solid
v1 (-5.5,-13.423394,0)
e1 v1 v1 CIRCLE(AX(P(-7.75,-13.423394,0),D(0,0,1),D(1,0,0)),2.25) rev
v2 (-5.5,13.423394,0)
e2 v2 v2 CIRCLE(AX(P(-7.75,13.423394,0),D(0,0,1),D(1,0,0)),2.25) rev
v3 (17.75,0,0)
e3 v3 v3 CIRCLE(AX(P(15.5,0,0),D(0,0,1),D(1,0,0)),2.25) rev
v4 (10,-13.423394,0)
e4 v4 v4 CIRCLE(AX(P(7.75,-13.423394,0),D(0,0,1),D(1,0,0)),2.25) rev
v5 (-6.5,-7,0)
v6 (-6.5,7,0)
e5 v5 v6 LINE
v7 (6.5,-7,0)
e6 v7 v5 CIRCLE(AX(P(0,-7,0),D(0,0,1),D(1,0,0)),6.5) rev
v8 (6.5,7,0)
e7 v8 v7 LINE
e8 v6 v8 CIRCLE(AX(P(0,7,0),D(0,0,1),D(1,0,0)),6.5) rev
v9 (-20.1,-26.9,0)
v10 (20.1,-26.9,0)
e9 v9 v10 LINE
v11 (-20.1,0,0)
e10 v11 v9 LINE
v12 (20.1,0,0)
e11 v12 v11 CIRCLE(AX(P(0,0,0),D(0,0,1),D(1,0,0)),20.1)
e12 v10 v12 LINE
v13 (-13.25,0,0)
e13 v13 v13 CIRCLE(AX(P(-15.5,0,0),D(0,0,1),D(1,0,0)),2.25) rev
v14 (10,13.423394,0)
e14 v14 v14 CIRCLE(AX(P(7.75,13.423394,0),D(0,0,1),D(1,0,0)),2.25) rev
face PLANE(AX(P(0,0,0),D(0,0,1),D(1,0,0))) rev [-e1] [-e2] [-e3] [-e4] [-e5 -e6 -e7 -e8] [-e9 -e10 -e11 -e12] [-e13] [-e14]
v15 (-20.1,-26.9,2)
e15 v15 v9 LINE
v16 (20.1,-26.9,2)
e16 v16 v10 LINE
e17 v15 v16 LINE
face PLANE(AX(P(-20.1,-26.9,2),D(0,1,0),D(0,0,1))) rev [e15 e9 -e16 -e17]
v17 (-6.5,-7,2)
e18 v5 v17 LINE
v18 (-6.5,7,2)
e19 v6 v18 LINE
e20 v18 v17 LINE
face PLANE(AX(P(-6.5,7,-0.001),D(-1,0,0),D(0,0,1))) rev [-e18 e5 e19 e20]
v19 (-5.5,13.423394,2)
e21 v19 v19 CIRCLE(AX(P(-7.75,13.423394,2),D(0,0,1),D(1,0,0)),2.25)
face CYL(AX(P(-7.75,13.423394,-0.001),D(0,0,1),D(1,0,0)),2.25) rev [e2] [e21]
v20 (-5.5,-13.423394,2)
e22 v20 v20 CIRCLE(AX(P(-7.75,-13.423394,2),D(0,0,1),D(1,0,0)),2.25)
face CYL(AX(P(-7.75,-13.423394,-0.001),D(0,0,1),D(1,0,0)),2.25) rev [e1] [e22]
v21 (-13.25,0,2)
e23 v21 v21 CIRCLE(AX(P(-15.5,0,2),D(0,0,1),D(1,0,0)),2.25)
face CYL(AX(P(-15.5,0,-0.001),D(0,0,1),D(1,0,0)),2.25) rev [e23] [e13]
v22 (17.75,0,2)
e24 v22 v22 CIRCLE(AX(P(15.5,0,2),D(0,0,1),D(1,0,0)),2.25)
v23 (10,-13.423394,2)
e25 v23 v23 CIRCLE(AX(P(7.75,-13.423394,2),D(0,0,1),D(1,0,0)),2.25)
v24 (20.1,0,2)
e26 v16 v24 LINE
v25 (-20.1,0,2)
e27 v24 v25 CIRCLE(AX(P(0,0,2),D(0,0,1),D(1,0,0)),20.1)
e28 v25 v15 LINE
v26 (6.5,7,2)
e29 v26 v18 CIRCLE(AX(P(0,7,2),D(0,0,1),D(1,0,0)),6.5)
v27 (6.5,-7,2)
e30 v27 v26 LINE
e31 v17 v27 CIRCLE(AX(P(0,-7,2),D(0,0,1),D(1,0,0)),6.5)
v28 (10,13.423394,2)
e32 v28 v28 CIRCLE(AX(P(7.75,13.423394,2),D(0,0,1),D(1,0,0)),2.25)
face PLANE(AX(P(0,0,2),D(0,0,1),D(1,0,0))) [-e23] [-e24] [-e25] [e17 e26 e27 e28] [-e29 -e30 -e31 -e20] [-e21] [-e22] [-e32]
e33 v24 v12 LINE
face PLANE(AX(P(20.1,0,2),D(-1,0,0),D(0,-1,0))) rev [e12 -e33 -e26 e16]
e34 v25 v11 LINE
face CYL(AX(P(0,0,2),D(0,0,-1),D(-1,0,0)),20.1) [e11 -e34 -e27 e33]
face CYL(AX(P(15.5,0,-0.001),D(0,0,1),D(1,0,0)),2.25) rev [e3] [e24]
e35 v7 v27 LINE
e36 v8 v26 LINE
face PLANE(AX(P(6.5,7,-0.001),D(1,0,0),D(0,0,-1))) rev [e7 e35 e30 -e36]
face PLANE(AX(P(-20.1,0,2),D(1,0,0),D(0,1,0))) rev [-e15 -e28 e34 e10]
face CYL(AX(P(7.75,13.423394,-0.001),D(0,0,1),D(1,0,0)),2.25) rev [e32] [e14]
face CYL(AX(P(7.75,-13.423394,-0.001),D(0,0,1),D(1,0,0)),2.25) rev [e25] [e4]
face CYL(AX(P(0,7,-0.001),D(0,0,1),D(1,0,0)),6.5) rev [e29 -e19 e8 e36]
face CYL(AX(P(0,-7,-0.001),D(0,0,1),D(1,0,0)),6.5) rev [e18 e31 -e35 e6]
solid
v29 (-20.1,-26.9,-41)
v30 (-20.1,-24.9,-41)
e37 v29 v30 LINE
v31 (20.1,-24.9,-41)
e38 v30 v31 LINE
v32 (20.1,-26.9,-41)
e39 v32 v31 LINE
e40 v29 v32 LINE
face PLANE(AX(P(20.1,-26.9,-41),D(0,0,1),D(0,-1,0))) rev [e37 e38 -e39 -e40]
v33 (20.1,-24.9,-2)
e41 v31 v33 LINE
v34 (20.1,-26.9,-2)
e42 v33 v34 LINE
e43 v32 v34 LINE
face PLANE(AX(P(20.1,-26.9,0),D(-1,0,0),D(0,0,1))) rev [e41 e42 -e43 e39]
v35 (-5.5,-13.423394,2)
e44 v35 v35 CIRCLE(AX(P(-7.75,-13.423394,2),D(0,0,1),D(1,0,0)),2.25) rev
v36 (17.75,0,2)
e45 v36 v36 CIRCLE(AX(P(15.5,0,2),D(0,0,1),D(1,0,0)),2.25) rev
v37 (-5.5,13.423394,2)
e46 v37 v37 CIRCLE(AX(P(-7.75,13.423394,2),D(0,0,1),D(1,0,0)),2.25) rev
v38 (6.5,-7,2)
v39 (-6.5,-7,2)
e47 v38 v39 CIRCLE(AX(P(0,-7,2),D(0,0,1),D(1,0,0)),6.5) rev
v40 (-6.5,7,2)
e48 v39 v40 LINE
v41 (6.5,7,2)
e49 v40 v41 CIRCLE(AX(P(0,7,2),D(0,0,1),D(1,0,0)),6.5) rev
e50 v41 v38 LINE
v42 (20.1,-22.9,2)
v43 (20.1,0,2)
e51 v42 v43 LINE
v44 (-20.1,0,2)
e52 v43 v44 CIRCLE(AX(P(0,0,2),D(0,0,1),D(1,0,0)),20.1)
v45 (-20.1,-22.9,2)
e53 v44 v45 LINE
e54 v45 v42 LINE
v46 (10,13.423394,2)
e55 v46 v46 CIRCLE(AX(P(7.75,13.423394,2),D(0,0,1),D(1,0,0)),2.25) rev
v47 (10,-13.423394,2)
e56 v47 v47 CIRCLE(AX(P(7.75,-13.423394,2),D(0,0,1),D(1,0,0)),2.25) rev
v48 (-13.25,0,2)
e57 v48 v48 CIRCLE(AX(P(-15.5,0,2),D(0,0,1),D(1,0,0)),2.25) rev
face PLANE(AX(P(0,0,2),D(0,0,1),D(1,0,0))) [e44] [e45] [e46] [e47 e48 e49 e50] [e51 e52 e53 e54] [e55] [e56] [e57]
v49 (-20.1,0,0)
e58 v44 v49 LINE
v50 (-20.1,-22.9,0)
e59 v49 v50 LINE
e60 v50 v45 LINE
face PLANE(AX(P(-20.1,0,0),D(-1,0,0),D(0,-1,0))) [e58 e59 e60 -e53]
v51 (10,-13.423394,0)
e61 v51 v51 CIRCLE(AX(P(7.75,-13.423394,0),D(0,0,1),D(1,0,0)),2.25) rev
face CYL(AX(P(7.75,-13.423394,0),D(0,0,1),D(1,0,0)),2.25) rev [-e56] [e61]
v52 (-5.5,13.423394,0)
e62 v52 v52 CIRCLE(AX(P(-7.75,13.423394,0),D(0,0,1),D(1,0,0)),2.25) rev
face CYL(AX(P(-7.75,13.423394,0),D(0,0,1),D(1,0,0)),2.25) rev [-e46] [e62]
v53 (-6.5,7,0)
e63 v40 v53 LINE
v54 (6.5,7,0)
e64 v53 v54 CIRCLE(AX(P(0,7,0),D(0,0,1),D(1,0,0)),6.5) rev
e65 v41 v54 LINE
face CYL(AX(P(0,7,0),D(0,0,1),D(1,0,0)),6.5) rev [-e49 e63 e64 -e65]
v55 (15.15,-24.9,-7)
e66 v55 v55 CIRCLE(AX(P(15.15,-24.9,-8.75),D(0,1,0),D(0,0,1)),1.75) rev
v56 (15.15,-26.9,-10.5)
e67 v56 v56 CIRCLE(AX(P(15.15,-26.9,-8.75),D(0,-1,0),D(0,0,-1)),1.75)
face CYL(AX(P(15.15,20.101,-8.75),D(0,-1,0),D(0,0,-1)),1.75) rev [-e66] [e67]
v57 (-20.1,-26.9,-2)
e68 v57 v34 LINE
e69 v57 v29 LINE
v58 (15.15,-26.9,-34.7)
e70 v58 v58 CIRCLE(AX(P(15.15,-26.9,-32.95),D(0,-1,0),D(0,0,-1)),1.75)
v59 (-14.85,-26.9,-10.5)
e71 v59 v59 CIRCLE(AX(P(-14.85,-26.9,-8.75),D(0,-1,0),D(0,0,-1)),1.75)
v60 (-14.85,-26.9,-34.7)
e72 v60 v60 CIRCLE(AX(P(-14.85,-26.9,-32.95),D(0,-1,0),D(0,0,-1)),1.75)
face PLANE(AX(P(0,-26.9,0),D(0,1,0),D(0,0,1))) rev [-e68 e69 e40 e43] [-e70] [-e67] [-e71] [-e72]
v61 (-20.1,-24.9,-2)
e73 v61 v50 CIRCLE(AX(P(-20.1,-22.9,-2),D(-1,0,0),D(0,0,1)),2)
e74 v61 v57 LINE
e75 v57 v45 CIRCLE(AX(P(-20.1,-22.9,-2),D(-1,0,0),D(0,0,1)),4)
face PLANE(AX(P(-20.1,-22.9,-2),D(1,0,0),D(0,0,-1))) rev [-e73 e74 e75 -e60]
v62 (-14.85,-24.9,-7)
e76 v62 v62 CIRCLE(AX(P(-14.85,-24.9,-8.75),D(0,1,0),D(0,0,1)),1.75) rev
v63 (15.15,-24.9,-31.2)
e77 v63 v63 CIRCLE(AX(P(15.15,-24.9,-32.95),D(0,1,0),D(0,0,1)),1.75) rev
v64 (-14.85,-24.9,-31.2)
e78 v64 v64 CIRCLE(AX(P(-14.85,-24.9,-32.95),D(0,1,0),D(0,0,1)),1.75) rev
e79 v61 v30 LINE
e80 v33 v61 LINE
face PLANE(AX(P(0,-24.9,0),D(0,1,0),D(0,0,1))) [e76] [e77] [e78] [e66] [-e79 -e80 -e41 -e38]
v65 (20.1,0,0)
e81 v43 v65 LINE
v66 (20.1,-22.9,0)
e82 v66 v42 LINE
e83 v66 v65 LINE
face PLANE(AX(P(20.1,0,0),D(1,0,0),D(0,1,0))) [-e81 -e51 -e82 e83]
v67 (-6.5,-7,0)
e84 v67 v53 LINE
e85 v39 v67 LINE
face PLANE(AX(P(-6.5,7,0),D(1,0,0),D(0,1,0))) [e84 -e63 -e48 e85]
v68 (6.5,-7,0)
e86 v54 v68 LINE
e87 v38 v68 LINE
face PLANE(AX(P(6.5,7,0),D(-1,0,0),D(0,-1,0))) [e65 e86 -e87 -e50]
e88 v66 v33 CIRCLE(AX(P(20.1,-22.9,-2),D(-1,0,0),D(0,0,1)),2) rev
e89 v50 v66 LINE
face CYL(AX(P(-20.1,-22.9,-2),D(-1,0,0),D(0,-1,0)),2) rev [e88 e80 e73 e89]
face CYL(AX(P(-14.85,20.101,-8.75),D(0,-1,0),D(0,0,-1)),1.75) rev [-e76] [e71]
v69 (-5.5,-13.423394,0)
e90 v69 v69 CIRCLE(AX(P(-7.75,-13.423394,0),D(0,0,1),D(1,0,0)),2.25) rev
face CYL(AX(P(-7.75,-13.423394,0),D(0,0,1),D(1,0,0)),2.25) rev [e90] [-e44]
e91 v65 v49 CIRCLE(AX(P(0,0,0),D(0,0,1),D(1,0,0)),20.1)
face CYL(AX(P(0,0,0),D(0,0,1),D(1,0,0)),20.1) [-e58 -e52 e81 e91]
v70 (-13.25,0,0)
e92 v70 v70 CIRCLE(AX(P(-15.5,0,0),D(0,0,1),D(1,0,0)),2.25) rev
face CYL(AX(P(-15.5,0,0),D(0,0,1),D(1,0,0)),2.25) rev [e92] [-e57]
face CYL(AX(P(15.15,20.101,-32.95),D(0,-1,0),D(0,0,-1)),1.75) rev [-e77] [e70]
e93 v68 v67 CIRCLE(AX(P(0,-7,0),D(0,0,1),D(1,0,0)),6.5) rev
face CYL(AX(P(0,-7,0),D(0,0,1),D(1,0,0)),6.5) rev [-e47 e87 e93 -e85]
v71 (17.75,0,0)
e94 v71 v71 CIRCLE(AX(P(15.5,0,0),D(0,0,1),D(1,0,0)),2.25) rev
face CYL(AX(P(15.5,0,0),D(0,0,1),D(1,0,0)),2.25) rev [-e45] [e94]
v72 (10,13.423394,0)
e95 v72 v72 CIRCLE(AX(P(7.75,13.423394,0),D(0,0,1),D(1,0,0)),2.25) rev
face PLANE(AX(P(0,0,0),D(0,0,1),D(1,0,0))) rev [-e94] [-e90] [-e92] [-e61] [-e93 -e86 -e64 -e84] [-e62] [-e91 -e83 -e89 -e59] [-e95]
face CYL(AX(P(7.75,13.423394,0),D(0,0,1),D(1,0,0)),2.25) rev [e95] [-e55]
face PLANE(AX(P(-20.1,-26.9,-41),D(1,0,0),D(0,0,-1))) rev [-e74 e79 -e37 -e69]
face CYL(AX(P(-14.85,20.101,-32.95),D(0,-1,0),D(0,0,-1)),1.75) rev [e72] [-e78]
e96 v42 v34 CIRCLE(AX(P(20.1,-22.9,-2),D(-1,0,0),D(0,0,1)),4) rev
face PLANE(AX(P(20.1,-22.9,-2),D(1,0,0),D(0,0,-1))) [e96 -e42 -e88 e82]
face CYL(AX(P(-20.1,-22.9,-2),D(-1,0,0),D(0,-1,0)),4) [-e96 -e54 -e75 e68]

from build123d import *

# Parameters (mm, degrees)
EXTRUDE_1_DEPTH                  = 2
CUT_EXTRUDE_1_REACH              = 35.64
SKETCH_2_R                       = 2.25
CUT_EXTRUDE_2_REACH              = 35.64
SHEET_METAL_2_OUTLINE_R          = 2.25
SHEET_METAL_2_DEPTH              = 2
SM_EDGE_FLANGE_1_STRIP_W         = 12
SM_EDGE_FLANGE_1_STRIP_H         = 2
SM_EDGE_FLANGE_1_STRIP_CUT_DEPTH = 40.2
SM_EDGE_FLANGE_1_DEPTH           = 40.2
SKETCH_12_R                      = 1.75
CUT_EXTRUDE_3_DEPTH              = 2


# Read off the part's stored shape, not the designer's step: 转换实体2
# Sheet-metal steps are written as plain solids
with BuildPart() as part:
    # 草图1 → 凸台-拉伸1 (new body)
    with BuildSketch(Plane.XY):
        with BuildLine():
            Line((-20.1, 0), (-20.1, -26.9))
            Line((-20.1, -26.9), (20.1, -26.9))
            Line((20.1, -26.9), (20.1, 0))
            ThreePointArc((20.1, 0), (0, 20.1), (-20.1, 0))
        make_face()
    extrude(amount=EXTRUDE_1_DEPTH)

    # Sketch 2 → 切除-拉伸1 (cut, up to next)
    with BuildSketch(Plane.XY.offset(2), mode=Mode.PRIVATE) as cut_extrude_1_sk1:
        with Locations((-15.5, 0)):
            Circle(SKETCH_2_R)
    cut_extrude_1_tool1 = extrude(cut_extrude_1_sk1.sketch, amount=-CUT_EXTRUDE_1_REACH, mode=Mode.PRIVATE) & part.part
    # Sketch 2 → 切除-拉伸1 (cut, up to next)
    with BuildSketch(Plane.XY.offset(2), mode=Mode.PRIVATE) as cut_extrude_1_sk2:
        with Locations((-7.75, 13.423393759)):
            Circle(SKETCH_2_R)
    cut_extrude_1_tool2 = extrude(cut_extrude_1_sk2.sketch, amount=-CUT_EXTRUDE_1_REACH, mode=Mode.PRIVATE) & part.part
    # Sketch 2 → 切除-拉伸1 (cut, up to next)
    with BuildSketch(Plane.XY.offset(2), mode=Mode.PRIVATE) as cut_extrude_1_sk3:
        with Locations((7.75, 13.423393759)):
            Circle(SKETCH_2_R)
    cut_extrude_1_tool3 = extrude(cut_extrude_1_sk3.sketch, amount=-CUT_EXTRUDE_1_REACH, mode=Mode.PRIVATE) & part.part
    # Sketch 2 → 切除-拉伸1 (cut, up to next)
    with BuildSketch(Plane.XY.offset(2), mode=Mode.PRIVATE) as cut_extrude_1_sk4:
        with Locations((15.5, 0)):
            Circle(SKETCH_2_R)
    cut_extrude_1_tool4 = extrude(cut_extrude_1_sk4.sketch, amount=-CUT_EXTRUDE_1_REACH, mode=Mode.PRIVATE) & part.part
    # Sketch 2 → 切除-拉伸1 (cut, up to next)
    with BuildSketch(Plane.XY.offset(2), mode=Mode.PRIVATE) as cut_extrude_1_sk5:
        with Locations((7.75, -13.423393759)):
            Circle(SKETCH_2_R)
    cut_extrude_1_tool5 = extrude(cut_extrude_1_sk5.sketch, amount=-CUT_EXTRUDE_1_REACH, mode=Mode.PRIVATE) & part.part
    # Sketch 2 → 切除-拉伸1 (cut, up to next)
    with BuildSketch(Plane.XY.offset(2), mode=Mode.PRIVATE) as cut_extrude_1_sk6:
        with Locations((-7.75, -13.423393759)):
            Circle(SKETCH_2_R)
    cut_extrude_1_tool6 = extrude(cut_extrude_1_sk6.sketch, amount=-CUT_EXTRUDE_1_REACH, mode=Mode.PRIVATE) & part.part
    add(cut_extrude_1_tool1.solids().sort_by_distance((-15.5, 0, 2))[0], mode=Mode.SUBTRACT)
    add(cut_extrude_1_tool2.solids().sort_by_distance((-7.75, 13.423394, 2))[0], mode=Mode.SUBTRACT)
    add(cut_extrude_1_tool3.solids().sort_by_distance((7.75, 13.423394, 2))[0], mode=Mode.SUBTRACT)
    add(cut_extrude_1_tool4.solids().sort_by_distance((15.5, 0, 2))[0], mode=Mode.SUBTRACT)
    add(cut_extrude_1_tool5.solids().sort_by_distance((7.75, -13.423394, 2))[0], mode=Mode.SUBTRACT)
    add(cut_extrude_1_tool6.solids().sort_by_distance((-7.75, -13.423394, 2))[0], mode=Mode.SUBTRACT)

    # 草图3 → 切除-拉伸2 (cut, up to next)
    with BuildSketch(Plane.XY.offset(2), mode=Mode.PRIVATE) as cut_extrude_2_sk1:
        with BuildLine():
            Line((-6.5, 7), (-6.5, -7))
            ThreePointArc((-6.5, -7), (0, -13.5), (6.5, -7))
            Line((6.5, -7), (6.5, 7))
            ThreePointArc((6.5, 7), (0, 13.5), (-6.5, 7))
        make_face()
    cut_extrude_2_tool1 = extrude(cut_extrude_2_sk1.sketch, amount=-CUT_EXTRUDE_2_REACH, mode=Mode.PRIVATE) & part.part
    add(cut_extrude_2_tool1.solids().sort_by_distance((0, 0, 2))[0], mode=Mode.SUBTRACT)


with BuildPart() as body_2:
    # Sheet Metal 2 outline → Sheet Metal 2 (new body)
    with BuildSketch(Plane.XY):
        with BuildLine():
            ThreePointArc((20.1, 0), (0, 20.1), (-20.1, 0))
            Line((-20.1, 0), (-20.1, -26.9))
            Line((-20.1, -26.9), (20.1, -26.9))
            Line((20.1, -26.9), (20.1, 0))
        make_face()
        with Locations((-7.75, -13.423393759)):
            Circle(SHEET_METAL_2_OUTLINE_R, mode=Mode.SUBTRACT)
        with Locations((7.75, -13.423393759)):
            Circle(SHEET_METAL_2_OUTLINE_R, mode=Mode.SUBTRACT)
        with Locations((-15.5, 0)):
            Circle(SHEET_METAL_2_OUTLINE_R, mode=Mode.SUBTRACT)
        with Locations((-7.75, 13.423393759)):
            Circle(SHEET_METAL_2_OUTLINE_R, mode=Mode.SUBTRACT)
        with BuildLine():
            ThreePointArc((-6.5, 7), (0, 13.5), (6.5, 7))
            Line((6.5, 7), (6.5, -7))
            ThreePointArc((6.5, -7), (0, -13.5), (-6.5, -7))
            Line((-6.5, -7), (-6.5, 7))
        make_face(mode=Mode.SUBTRACT)
        with Locations((15.5, 0)):
            Circle(SHEET_METAL_2_OUTLINE_R, mode=Mode.SUBTRACT)
        with Locations((7.75, 13.423393759)):
            Circle(SHEET_METAL_2_OUTLINE_R, mode=Mode.SUBTRACT)
    extrude(amount=SHEET_METAL_2_DEPTH)

    # 边线-法兰1 strip (across the edge) → 边线-法兰1 strip cut (cut)
    with BuildSketch(Plane(origin=(20.1, -26.9, 0), x_dir=(0, 1, 0), z_dir=(-1, 0, 0))):
        with Locations((-2, -1)):
            Rectangle(SM_EDGE_FLANGE_1_STRIP_W, SM_EDGE_FLANGE_1_STRIP_H)
    extrude(amount=SM_EDGE_FLANGE_1_STRIP_CUT_DEPTH, mode=Mode.SUBTRACT)

    # 边线-法兰1 section (across the edge) → 边线-法兰1 (add)
    with BuildSketch(Plane(origin=(20.1, -26.9, 0), x_dir=(0, 1, 0), z_dir=(-1, 0, 0))):
        with BuildLine():
            Line((0, 2), (0, 41))
            Line((0, 41), (2, 41))
            Line((2, 41), (2, 2))
            ThreePointArc((2, 2), (2.585786438, 0.585786438), (4, 0))
            Line((4, 0), (4, -2))
            ThreePointArc((4, -2), (1.171572875, -0.828427125), (0, 2))
        make_face()
    extrude(amount=SM_EDGE_FLANGE_1_DEPTH)

    # 草图12 → 切除-拉伸3 (cut)
    with BuildSketch(Plane(origin=(0, -26.9, 0), x_dir=(-1, 0, 0), z_dir=(0, -1, 0))):
        with Locations(Location((14.85, 32.95, 0), (0, 0, 90))):
            Circle(SKETCH_12_R)
        with Locations(Location((-15.15, 32.95, 0), (0, 0, 90))):
            Circle(SKETCH_12_R)
        with Locations(Location((-15.15, 8.75, 0), (0, 0, 90))):
            Circle(SKETCH_12_R)
        with Locations(Location((14.85, 8.75, 0), (0, 0, 90))):
            Circle(SKETCH_12_R)
    extrude(amount=-CUT_EXTRUDE_3_DEPTH, mode=Mode.SUBTRACT)


solid = Compound([part.part, body_2.part])
